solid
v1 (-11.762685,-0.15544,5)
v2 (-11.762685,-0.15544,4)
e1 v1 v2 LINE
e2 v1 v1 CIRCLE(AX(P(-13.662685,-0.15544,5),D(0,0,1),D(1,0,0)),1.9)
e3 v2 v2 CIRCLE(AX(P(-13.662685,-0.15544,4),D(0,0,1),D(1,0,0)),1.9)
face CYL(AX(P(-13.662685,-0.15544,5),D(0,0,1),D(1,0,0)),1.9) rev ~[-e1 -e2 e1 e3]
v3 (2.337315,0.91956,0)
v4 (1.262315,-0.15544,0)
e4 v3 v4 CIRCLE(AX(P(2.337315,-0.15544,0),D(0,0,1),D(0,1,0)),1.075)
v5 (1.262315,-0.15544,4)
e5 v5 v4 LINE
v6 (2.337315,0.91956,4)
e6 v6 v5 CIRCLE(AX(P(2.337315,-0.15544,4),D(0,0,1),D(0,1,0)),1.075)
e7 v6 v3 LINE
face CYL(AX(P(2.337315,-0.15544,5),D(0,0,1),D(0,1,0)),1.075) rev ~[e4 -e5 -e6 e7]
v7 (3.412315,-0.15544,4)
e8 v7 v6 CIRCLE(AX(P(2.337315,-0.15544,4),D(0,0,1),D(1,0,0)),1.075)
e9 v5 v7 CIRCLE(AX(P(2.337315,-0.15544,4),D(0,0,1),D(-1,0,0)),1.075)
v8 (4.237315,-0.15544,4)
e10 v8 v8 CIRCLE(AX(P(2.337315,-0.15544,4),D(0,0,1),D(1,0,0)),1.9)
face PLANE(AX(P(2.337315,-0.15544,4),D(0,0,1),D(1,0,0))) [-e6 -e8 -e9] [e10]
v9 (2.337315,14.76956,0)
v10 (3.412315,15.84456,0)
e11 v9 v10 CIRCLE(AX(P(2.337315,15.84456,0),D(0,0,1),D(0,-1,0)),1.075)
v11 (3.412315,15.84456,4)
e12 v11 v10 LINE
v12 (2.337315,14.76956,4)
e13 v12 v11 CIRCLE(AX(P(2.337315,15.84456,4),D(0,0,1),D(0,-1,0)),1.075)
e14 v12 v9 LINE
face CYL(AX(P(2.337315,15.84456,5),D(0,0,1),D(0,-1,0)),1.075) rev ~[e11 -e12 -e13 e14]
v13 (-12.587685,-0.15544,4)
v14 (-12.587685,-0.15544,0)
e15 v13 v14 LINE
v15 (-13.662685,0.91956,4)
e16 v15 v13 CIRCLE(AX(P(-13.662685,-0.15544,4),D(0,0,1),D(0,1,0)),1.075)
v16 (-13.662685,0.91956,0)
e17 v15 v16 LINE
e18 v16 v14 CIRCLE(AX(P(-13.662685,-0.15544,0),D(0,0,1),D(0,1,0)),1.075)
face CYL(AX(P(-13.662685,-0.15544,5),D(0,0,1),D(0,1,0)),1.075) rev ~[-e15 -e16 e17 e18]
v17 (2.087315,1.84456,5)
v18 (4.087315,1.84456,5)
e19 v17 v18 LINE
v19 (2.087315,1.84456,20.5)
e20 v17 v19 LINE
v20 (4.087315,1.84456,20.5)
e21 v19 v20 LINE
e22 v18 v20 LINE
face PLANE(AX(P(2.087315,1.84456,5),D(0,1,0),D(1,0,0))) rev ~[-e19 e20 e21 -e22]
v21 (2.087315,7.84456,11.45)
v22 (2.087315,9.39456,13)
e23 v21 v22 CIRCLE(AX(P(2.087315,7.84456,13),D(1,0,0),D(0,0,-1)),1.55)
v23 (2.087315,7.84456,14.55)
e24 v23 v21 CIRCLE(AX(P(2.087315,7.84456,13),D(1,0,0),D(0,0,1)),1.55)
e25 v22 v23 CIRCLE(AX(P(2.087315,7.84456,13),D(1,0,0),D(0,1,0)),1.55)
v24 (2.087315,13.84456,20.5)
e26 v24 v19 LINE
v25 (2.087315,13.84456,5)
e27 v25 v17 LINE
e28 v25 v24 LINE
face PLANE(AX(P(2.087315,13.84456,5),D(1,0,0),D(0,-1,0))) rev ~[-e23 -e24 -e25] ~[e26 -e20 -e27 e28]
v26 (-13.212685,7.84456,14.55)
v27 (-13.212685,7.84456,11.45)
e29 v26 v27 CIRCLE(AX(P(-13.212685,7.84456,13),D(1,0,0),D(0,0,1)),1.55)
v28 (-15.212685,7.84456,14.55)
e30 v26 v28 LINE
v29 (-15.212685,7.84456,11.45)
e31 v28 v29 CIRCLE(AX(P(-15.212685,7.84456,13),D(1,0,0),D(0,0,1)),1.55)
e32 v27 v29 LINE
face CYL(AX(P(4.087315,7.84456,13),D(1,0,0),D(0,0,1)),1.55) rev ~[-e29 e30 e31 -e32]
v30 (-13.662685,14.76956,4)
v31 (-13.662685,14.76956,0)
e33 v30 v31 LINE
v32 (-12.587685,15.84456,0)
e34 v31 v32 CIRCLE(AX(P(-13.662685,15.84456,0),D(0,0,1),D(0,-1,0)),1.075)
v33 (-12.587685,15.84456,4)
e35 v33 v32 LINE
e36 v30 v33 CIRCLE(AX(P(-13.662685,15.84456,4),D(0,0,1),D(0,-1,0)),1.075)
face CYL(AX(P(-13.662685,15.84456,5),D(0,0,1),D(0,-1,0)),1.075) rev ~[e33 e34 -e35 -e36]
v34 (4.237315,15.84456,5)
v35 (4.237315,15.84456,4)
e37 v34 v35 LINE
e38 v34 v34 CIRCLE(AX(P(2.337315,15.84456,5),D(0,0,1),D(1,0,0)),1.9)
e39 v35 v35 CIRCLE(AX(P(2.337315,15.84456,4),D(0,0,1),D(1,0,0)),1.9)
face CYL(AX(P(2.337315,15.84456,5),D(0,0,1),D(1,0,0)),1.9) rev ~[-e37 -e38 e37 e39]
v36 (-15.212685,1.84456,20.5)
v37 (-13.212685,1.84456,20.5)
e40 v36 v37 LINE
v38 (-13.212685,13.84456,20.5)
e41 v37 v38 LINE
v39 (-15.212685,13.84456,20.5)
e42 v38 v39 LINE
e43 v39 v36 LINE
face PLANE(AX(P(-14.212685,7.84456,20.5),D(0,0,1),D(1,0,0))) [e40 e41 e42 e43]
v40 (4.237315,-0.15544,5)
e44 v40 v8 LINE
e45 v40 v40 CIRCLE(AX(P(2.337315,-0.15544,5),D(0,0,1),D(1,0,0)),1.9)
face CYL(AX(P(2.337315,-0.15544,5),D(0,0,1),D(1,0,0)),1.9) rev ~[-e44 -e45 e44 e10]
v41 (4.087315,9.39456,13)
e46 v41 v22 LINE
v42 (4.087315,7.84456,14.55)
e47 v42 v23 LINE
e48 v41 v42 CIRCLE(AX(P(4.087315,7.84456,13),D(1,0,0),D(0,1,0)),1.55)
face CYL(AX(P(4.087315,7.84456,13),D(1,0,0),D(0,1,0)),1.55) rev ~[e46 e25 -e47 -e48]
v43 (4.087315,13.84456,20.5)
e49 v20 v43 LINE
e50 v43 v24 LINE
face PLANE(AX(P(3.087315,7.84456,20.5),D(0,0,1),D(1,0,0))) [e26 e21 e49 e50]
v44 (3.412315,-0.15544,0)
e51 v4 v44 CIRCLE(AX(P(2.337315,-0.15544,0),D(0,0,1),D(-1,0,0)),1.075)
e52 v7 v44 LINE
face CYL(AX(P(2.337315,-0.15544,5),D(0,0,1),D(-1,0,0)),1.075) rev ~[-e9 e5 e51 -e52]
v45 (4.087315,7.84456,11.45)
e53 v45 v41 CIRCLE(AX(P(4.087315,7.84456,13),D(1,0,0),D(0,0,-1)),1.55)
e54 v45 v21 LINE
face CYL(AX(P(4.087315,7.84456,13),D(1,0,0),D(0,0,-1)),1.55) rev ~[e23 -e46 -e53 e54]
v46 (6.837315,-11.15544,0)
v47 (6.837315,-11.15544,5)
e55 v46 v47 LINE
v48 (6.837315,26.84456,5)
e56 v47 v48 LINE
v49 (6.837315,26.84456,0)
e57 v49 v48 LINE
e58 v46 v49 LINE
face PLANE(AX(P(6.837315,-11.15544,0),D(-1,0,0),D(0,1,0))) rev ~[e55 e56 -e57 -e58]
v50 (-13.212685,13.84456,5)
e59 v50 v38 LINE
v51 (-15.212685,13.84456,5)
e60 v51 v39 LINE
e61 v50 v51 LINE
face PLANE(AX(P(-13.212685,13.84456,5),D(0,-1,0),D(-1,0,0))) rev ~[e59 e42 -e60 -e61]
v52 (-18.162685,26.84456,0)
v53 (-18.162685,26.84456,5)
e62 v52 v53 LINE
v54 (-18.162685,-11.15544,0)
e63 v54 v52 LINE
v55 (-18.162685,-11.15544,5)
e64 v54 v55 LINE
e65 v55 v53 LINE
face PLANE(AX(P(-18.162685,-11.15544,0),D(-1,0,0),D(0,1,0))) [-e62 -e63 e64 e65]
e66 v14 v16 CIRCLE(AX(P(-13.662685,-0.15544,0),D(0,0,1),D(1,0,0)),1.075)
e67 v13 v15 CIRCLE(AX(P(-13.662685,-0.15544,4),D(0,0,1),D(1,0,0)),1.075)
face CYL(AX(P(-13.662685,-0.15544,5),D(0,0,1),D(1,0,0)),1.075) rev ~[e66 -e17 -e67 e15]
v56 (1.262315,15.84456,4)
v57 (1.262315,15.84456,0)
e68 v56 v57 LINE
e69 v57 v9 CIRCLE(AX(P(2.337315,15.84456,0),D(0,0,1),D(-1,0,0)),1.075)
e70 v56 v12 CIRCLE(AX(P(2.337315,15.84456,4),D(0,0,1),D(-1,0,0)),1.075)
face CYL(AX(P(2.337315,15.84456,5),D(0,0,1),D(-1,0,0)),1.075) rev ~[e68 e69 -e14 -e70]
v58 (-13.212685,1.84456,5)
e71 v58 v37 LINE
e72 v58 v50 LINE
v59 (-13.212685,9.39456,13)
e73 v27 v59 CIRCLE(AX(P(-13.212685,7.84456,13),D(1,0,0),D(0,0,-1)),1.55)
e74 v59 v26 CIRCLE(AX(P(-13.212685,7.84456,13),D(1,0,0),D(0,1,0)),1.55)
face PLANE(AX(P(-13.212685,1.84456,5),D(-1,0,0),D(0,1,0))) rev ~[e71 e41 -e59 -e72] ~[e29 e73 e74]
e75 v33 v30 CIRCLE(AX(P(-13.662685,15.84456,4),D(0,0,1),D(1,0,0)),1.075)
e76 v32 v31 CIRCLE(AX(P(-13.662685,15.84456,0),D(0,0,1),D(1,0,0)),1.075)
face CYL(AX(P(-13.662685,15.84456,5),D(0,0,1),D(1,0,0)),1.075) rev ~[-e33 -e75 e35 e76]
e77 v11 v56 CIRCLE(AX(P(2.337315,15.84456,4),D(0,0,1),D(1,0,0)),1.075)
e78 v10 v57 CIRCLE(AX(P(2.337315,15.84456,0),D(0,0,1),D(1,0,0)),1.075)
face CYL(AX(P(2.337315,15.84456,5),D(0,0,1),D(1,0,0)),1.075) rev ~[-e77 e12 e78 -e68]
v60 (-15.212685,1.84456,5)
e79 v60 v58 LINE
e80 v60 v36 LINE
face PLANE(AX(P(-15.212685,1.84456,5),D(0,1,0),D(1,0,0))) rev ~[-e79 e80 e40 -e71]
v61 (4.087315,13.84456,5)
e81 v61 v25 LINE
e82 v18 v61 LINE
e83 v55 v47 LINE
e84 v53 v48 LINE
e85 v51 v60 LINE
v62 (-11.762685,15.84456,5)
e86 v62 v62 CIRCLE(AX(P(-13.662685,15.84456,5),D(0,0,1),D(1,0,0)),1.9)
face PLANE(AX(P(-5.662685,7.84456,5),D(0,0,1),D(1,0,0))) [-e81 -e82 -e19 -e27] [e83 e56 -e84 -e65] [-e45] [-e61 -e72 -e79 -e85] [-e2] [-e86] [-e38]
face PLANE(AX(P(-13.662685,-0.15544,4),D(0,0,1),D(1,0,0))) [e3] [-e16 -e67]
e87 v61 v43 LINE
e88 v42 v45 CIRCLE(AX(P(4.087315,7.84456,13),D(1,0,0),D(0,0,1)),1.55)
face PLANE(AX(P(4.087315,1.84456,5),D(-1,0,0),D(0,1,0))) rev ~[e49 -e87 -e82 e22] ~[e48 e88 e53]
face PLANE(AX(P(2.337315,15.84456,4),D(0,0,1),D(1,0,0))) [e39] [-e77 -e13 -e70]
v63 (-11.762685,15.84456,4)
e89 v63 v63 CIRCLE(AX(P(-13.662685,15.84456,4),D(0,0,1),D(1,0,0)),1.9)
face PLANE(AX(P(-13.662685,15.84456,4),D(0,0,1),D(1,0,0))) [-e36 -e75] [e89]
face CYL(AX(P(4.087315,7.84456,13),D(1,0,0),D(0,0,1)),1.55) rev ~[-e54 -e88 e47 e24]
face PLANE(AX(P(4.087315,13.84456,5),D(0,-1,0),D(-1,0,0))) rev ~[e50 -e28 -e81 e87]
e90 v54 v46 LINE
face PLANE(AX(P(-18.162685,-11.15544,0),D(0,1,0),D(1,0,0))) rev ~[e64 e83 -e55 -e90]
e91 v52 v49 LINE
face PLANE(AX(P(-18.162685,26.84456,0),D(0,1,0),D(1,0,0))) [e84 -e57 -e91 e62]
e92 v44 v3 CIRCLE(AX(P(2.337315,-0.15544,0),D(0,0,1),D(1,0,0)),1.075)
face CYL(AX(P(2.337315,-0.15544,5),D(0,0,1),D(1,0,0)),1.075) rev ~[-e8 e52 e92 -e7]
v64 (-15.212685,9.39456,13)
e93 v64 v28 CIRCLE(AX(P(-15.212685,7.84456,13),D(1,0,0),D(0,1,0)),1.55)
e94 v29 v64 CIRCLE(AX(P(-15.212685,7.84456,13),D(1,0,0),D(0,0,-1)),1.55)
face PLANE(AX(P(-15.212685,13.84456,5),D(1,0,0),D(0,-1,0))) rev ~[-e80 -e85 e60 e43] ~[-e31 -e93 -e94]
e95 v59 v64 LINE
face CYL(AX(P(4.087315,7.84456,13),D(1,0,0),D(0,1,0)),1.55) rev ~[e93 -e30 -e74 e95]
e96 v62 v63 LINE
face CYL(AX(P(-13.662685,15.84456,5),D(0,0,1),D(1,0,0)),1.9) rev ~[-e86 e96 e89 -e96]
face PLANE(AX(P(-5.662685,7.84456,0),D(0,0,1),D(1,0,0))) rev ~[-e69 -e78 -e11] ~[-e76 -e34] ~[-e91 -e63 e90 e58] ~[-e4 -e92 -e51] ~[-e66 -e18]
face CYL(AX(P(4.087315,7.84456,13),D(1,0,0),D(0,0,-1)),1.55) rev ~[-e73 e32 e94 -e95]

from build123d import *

# Parameters (mm, degrees)
F0_W     = 25
F0_H     = 38
F1_DEPTH = 5
F3_DEPTH = 5
F5_DEPTH = 15.5
F7_DEPTH = 25
F8_R     = 1.9
F9_DEPTH = 1


# Not quite as in the source:
# - a feature names something its author has since deleted; it is built from what else it names


with BuildPart() as f1:
    # F0 (on Top) → F1 (new body)
    with BuildSketch(Plane.XY):
        with Locations((-5.6626851261, 7.8445598302)):
            Rectangle(F0_W, F0_H)
    extrude(amount=F1_DEPTH)

    # F2 (on face) → F3 (cut)
    with BuildSketch(Plane.XY.offset(5)):
        with BuildLine():
            Line((-13.6626851261, 15.8445598302), (-12.5876851261, 15.8445598302))
            ThreePointArc((-12.5876851261, 15.8445598302), (-14.4228249158, 16.60469962), (-13.6626851261, 14.7695598302))
            Line((-13.6626851261, 14.7695598302), (-13.6626851261, 15.8445598302))
        make_face()
        with BuildLine():
            ThreePointArc((-13.6626851261, 14.7695598302), (-12.9025453363, 15.0844200404), (-12.5876851261, 15.8445598302))
            Line((-12.5876851261, 15.8445598302), (-13.6626851261, 15.8445598302))
            Line((-13.6626851261, 15.8445598302), (-13.6626851261, 14.7695598302))
        make_face()
        with BuildLine():
            Line((2.3373148739, 15.8445598302), (1.2623148739, 15.8445598302))
            ThreePointArc((1.2623148739, 15.8445598302), (1.5771750842, 15.0844200404), (2.3373148739, 14.7695598302))
            Line((2.3373148739, 14.7695598302), (2.3373148739, 15.8445598302))
        make_face()
        with BuildLine():
            ThreePointArc((3.4123148739, 15.8445598302), (2.3373148739, 16.9195598302), (1.2623148739, 15.8445598302))
            Line((1.2623148739, 15.8445598302), (2.3373148739, 15.8445598302))
            Line((2.3373148739, 15.8445598302), (2.3373148739, 14.7695598302))
            ThreePointArc((2.3373148739, 14.7695598302), (3.0974546637, 15.0844200404), (3.4123148739, 15.8445598302))
        make_face()
        with BuildLine():
            Line((-13.6626851261, -0.1554401698), (-13.6626851261, 0.9195598302))
            ThreePointArc((-13.6626851261, 0.9195598302), (-14.4228249158, -0.9155799596), (-12.5876851261, -0.1554401698))
            Line((-12.5876851261, -0.1554401698), (-13.6626851261, -0.1554401698))
        make_face()
        with BuildLine():
            ThreePointArc((-12.5876851261, -0.1554401698), (-12.9025453363, 0.60469962), (-13.6626851261, 0.9195598302))
            Line((-13.6626851261, 0.9195598302), (-13.6626851261, -0.1554401698))
            Line((-13.6626851261, -0.1554401698), (-12.5876851261, -0.1554401698))
        make_face()
        with BuildLine():
            Line((2.3373148739, -0.1554401698), (2.3373148739, 0.9195598302))
            ThreePointArc((2.3373148739, 0.9195598302), (1.5771750842, 0.60469962), (1.2623148739, -0.1554401698))
            Line((1.2623148739, -0.1554401698), (2.3373148739, -0.1554401698))
        make_face()
        with BuildLine():
            ThreePointArc((3.4123148739, -0.1554401698), (3.0974546637, 0.60469962), (2.3373148739, 0.9195598302))
            Line((2.3373148739, 0.9195598302), (2.3373148739, -0.1554401698))
            Line((2.3373148739, -0.1554401698), (1.2623148739, -0.1554401698))
            ThreePointArc((1.2623148739, -0.1554401698), (2.3373148739, -1.2304401698), (3.4123148739, -0.1554401698))
        make_face()
    extrude(amount=-F3_DEPTH, mode=Mode.SUBTRACT)

    # F4 (on face) → F5 (join)
    with BuildSketch(Plane.XY.offset(5)):
        Polygon((-15.2126851261, 13.8445598302), (-15.2126851261, 1.8445598302), (-14.2126851261, 1.8445598302), (-13.2126851261, 1.8445598302), (-13.2126851261, 13.8445598302), (-14.2126851261, 13.8445598302), align=None)
        Polygon((4.0873148739, 13.8445598302), (3.0873148739, 13.8445598302), (2.0873148739, 13.8445598302), (2.0873148739, 1.8445598302), (4.0873148739, 1.8445598302), align=None)
    extrude(amount=F5_DEPTH)

    # F6 (on face) → F7 (cut)
    with BuildSketch(Plane.YZ.offset(4.0873148739)):
        with BuildLine():
            Line((7.8445598302, 11.45), (7.8445598302, 14.55))
            ThreePointArc((7.8445598302, 14.55), (6.2945598302, 13), (7.8445598302, 11.45))
        make_face()
        with BuildLine():
            ThreePointArc((7.8445598302, 11.45), (8.9405753411, 11.9039844892), (9.3945598302, 13))
            ThreePointArc((9.3945598302, 13), (8.9405753411, 14.0960155108), (7.8445598302, 14.55))
            Line((7.8445598302, 14.55), (7.8445598302, 11.45))
        make_face()
    extrude(amount=-F7_DEPTH, mode=Mode.SUBTRACT)

    # F8 (on face) → F9 (cut)
    with BuildSketch(Plane.XY.offset(5)):
        with Locations((-13.6626851261, 15.8445598302)):
            Circle(F8_R)
        with Locations((2.3373148739, 15.8445598302)):
            Circle(F8_R)
        with Locations((2.3373148739, -0.1554401698)):
            Circle(F8_R)
        with Locations((-13.6626851261, -0.1554401698)):
            Circle(F8_R)
    extrude(amount=-F9_DEPTH, mode=Mode.SUBTRACT)


solid = f1.part
